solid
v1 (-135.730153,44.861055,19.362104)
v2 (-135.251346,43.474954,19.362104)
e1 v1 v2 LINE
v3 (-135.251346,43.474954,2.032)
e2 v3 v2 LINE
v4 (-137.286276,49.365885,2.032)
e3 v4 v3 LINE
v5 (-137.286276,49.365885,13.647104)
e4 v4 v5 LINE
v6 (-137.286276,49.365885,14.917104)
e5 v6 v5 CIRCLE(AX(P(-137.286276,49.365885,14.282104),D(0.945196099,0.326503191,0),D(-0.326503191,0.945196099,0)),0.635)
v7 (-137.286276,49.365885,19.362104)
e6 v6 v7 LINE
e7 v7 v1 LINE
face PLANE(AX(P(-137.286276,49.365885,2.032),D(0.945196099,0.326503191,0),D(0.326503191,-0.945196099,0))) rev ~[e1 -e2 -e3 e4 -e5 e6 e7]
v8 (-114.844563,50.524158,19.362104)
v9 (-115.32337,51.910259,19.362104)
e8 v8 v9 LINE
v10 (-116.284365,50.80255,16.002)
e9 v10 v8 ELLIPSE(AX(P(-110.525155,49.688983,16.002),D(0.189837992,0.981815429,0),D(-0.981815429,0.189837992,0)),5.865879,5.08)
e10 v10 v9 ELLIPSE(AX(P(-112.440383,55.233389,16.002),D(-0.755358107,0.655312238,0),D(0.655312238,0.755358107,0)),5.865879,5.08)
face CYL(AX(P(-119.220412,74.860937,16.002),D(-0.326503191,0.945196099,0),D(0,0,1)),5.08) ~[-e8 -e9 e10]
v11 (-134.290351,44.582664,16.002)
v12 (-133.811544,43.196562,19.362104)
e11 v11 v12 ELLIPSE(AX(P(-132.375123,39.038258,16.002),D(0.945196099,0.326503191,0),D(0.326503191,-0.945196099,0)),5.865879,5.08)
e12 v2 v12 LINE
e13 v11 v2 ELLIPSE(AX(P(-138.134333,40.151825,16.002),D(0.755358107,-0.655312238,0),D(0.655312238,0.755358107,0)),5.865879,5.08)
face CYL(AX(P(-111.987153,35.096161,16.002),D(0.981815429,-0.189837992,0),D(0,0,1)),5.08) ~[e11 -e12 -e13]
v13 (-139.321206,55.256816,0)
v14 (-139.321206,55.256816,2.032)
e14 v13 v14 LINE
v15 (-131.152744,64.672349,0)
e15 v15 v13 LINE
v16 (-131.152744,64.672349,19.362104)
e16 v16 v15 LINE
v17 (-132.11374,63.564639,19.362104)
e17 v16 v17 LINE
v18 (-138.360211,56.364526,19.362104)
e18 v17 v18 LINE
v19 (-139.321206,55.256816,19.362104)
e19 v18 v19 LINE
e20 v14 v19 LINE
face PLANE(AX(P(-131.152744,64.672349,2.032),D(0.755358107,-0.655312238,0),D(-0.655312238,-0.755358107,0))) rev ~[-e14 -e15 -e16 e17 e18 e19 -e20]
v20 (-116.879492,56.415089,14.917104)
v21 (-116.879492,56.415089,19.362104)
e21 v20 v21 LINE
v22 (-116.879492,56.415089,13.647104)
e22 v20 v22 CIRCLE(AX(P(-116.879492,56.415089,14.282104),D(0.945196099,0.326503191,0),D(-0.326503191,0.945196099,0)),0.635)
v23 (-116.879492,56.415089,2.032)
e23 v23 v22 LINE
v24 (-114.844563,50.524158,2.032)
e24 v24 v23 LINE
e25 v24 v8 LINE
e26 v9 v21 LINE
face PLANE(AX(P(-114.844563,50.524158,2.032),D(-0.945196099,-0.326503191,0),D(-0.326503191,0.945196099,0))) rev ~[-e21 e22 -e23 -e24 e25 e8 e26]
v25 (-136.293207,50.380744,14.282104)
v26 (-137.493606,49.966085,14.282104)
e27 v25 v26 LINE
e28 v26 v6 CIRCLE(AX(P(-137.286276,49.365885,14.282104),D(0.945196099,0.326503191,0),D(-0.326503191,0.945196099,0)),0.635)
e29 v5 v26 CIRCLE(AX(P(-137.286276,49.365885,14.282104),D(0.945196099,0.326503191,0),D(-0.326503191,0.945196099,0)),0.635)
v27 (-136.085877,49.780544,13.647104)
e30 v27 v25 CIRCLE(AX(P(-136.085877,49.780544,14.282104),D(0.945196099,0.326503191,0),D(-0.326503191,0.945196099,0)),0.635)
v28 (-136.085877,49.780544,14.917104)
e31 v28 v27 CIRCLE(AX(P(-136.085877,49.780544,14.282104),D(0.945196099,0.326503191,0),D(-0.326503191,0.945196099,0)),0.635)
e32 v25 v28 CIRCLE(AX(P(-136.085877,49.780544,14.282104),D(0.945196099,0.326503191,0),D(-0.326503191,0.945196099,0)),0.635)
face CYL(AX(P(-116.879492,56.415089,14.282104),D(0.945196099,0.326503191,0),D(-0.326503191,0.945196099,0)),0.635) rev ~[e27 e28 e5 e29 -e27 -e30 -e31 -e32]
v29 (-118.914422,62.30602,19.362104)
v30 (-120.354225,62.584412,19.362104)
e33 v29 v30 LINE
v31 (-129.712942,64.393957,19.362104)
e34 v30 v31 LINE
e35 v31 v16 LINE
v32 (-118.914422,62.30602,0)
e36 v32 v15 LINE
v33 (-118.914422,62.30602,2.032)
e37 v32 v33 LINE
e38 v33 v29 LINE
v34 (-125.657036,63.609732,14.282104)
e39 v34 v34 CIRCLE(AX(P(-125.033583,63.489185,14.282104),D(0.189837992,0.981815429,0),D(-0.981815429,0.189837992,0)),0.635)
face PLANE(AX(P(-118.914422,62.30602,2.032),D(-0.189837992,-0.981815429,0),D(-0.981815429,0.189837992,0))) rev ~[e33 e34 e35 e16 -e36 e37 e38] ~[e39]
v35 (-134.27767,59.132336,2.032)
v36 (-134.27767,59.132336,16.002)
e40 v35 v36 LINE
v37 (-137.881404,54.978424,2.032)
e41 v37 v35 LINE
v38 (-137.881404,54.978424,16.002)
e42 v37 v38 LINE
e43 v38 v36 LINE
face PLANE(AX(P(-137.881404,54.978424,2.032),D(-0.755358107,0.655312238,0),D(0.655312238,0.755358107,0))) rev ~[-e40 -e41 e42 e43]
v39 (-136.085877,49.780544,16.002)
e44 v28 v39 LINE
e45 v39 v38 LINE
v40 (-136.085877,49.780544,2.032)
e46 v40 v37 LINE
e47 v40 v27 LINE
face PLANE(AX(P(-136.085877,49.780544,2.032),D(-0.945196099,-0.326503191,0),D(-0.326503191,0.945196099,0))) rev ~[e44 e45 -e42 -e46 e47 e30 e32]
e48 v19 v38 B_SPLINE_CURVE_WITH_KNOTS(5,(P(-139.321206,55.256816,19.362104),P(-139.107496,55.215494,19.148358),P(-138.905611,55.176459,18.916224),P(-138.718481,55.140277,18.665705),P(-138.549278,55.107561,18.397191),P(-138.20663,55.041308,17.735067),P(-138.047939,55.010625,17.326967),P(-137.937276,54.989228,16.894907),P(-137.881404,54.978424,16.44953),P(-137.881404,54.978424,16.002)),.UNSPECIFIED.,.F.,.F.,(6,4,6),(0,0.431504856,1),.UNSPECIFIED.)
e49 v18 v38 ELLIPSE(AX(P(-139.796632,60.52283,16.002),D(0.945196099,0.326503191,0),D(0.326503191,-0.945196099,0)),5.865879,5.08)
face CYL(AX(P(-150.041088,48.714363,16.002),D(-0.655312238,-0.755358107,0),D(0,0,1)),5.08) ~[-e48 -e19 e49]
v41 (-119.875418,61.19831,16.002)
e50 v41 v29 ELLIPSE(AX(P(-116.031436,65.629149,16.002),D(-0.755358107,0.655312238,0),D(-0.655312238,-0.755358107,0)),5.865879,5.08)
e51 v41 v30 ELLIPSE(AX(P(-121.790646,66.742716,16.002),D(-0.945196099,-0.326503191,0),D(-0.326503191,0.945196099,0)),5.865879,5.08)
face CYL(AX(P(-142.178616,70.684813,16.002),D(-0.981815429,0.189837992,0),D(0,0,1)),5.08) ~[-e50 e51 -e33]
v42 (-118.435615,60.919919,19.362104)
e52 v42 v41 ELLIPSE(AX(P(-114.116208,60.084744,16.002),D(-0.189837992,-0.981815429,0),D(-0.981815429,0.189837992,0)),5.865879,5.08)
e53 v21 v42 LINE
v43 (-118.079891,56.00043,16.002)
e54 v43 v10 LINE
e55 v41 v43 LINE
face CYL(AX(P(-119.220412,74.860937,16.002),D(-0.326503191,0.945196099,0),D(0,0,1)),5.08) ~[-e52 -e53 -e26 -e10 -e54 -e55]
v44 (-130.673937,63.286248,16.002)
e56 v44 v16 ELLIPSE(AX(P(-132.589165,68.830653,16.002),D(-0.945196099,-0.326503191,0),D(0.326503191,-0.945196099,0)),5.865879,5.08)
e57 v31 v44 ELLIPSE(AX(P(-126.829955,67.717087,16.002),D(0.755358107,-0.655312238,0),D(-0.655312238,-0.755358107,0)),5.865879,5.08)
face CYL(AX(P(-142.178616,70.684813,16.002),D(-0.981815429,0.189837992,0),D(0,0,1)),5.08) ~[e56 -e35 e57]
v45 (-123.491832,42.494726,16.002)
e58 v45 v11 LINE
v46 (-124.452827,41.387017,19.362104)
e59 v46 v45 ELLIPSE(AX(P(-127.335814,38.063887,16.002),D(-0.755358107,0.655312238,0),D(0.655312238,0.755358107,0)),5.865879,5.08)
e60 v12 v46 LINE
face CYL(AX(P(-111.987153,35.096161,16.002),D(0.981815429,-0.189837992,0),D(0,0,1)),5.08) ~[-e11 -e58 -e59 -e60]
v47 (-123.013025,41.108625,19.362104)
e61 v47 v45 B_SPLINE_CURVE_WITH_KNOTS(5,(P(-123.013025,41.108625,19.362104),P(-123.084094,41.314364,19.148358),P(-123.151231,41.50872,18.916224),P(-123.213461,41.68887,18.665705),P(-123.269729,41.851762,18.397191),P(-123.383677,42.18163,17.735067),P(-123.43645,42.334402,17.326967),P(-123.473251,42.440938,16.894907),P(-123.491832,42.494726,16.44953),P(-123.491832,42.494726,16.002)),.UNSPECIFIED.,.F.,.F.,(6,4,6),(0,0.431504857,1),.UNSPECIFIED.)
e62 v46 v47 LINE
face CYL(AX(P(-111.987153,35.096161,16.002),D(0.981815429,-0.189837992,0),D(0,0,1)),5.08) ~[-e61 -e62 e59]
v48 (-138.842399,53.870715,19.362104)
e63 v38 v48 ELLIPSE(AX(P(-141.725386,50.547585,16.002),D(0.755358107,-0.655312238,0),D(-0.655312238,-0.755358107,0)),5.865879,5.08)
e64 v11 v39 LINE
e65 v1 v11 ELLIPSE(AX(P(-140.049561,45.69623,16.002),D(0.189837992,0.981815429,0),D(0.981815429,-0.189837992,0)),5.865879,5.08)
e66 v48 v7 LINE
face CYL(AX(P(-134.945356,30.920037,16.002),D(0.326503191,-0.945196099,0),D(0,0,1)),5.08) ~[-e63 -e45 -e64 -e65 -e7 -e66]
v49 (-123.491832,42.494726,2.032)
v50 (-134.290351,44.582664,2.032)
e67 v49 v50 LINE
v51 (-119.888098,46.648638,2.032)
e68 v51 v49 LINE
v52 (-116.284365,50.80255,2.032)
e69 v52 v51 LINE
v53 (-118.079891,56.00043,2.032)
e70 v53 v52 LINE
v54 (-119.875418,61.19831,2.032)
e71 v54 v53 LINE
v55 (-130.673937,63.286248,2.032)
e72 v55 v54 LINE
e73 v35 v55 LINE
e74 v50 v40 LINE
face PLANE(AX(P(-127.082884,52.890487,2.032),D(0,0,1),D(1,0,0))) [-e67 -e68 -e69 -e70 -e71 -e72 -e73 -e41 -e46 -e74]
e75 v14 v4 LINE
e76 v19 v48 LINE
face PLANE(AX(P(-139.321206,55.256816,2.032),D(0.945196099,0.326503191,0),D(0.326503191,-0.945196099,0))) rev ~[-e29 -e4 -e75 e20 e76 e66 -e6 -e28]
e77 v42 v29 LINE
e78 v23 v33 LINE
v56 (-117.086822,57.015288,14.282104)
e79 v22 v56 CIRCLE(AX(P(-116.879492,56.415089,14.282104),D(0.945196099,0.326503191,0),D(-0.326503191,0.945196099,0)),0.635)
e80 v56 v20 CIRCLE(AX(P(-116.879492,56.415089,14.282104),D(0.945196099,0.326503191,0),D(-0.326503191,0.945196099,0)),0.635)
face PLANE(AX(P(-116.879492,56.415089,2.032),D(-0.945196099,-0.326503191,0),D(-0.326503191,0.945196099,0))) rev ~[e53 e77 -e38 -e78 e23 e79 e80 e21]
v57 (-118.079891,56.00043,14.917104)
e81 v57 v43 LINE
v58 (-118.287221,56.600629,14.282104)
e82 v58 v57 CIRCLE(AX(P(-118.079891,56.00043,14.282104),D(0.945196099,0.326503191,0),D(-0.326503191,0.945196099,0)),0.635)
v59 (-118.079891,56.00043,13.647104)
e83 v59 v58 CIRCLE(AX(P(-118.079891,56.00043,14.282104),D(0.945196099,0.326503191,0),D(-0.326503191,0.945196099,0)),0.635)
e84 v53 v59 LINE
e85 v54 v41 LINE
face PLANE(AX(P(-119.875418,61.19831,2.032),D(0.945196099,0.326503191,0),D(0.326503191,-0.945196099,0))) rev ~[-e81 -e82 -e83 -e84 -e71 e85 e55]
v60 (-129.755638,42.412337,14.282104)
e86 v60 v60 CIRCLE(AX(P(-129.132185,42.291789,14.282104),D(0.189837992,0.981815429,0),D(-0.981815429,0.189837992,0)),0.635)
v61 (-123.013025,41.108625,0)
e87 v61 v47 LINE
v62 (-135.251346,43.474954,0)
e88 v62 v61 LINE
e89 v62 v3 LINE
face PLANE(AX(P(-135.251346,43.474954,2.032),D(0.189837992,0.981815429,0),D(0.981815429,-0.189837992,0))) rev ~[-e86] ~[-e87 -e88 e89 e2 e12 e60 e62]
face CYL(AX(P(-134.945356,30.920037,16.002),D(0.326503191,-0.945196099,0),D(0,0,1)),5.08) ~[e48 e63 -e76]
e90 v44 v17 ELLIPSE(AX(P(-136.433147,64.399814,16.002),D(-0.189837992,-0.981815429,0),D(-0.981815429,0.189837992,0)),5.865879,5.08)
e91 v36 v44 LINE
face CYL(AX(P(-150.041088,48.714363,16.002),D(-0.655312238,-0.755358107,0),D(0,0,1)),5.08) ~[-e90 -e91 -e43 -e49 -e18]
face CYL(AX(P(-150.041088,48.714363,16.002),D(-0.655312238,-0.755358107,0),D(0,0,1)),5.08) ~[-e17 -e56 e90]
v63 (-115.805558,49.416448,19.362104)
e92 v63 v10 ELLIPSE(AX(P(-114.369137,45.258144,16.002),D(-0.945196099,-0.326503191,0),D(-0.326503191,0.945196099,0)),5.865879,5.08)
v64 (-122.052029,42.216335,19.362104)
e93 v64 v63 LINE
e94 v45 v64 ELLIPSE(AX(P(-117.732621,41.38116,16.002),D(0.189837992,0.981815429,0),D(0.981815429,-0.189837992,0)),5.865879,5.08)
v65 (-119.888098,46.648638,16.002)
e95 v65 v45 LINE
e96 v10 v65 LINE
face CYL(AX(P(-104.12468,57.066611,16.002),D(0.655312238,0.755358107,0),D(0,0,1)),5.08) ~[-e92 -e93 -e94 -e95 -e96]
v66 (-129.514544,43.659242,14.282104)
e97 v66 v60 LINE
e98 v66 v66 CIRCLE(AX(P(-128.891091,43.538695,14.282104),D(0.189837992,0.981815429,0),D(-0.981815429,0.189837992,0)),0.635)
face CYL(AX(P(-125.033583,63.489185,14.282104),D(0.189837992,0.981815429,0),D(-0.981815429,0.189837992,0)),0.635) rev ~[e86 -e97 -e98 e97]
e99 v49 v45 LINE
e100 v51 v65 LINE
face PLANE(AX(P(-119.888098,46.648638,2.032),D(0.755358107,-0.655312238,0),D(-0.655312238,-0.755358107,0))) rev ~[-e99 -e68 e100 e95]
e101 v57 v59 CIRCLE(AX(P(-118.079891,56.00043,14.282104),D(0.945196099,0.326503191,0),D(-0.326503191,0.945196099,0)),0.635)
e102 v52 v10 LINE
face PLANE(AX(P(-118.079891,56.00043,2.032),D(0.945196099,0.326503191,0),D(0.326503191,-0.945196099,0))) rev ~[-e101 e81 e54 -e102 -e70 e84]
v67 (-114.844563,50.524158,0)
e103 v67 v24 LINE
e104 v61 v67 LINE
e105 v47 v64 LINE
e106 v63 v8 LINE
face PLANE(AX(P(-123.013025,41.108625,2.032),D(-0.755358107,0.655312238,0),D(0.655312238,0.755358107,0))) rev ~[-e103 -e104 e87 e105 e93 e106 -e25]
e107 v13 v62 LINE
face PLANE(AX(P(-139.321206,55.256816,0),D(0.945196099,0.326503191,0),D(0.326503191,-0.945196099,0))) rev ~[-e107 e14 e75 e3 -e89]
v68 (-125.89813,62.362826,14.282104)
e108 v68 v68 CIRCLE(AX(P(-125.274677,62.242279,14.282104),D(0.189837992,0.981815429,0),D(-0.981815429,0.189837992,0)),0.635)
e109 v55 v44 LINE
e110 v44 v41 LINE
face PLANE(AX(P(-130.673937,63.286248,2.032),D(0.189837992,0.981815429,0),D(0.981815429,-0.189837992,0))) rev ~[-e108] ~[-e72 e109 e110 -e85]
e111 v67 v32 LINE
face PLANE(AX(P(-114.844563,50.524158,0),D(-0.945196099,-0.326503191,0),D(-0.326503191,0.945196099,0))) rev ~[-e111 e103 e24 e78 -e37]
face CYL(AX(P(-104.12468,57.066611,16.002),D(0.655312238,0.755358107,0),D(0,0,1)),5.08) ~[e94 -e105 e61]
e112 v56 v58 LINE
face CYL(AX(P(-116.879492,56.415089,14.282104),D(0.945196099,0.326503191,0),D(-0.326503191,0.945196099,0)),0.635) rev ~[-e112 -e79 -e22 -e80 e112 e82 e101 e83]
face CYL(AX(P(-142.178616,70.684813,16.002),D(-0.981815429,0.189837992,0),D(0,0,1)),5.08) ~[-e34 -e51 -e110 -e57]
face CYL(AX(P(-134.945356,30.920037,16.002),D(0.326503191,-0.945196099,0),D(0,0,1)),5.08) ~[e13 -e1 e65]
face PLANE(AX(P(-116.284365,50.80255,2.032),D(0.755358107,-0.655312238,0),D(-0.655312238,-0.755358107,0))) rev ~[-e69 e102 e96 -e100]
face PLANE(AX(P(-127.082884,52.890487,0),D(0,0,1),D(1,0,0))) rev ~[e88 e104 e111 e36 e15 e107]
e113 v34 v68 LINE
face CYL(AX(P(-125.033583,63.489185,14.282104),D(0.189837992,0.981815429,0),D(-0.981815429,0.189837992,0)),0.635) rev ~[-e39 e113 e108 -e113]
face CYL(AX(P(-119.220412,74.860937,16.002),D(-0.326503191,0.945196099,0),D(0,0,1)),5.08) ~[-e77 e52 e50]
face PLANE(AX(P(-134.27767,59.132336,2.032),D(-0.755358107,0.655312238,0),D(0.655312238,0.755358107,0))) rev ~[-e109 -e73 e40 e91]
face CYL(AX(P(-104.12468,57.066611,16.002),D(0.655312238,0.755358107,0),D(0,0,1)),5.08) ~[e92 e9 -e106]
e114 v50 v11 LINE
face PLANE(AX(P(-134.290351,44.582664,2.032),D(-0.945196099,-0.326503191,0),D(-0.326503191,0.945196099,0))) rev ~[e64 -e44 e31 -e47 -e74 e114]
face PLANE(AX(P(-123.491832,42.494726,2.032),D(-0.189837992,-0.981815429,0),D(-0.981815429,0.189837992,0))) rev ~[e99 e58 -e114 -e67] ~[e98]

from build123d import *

# Parameters (mm, degrees)
F1_DEPTH      = 2.032
F3_DEPTH      = 19.05
F4_T4_DEPTH   = 36.3985226281
F4_T10_DEPTH  = 36.3985226281
F4_T16_DEPTH  = 36.3985226281
F4_T22_DEPTH  = 36.3985226281
F4_T28_DEPTH  = 36.3985226281
F4_T34_DEPTH  = 36.3985226281
F4_T41_DEPTH  = 36.3985226281
F4_T47_DEPTH  = 36.3985226281
F4_T56_DEPTH  = 36.3985226281
F4_T62_DEPTH  = 36.3985226281
F4_T71_DEPTH  = 36.3985226281
F4_T77_DEPTH  = 36.3985226281
F4_T86_DEPTH  = 36.3985226281
F4_T92_DEPTH  = 36.3985226281
F4_T101_DEPTH = 36.3985226281
F4_T107_DEPTH = 36.3985226281
F4_T116_DEPTH = 36.3985226281
F4_T122_DEPTH = 36.3985226281
F6_R          = 0.635
F7_DEPTH      = 25.4
F5_R          = 0.635
F8_DEPTH      = 25.4


# Not quite as in the source:
# - a fillet or chamfer that OpenCascade refuses, or shapes differently, is made with other operations: its cross-section is extruded or revolved along the edge and cut away or added


with BuildPart() as f1:
    # F0 (on Top) → F1 (new body)
    with BuildSketch(Plane.XY):
        Polygon((-123.0130245504, 41.1086249019), (-114.844562537, 50.5241579017), (-118.9144222983, 62.306020015), (-131.1527440729, 64.6723491286), (-139.3212060863, 55.2568161288), (-135.2513463251, 43.4749540155), align=None)
    extrude(amount=F1_DEPTH)

    # F2 (on face) → F3 (join)
    with BuildSketch(Plane.XY.offset(2.032)):
        Polygon((-131.1527440729, 64.6723491286), (-135.2369750796, 59.9645826287), (-134.2776702834, 59.1323360859), (-130.6739370422, 63.2862477035), (-119.8754178293, 61.1983102503), (-118.079891464, 56.0004299062), (-116.8794924177, 56.4150889583), (-118.9144222983, 62.306020015), align=None)
        Polygon((-134.2776702834, 59.1323360859), (-135.2369750796, 59.9645826287), (-139.3212060863, 55.2568161288), (-137.2862762057, 49.3658850722), (-136.0858771593, 49.7805441243), (-137.8814035246, 54.9784244684), align=None)
        Polygon((-136.0858771593, 49.7805441243), (-137.2862762057, 49.3658850722), (-135.2513463251, 43.4749540155), (-123.0130245504, 41.1086249019), (-118.9287935437, 45.8163914018), (-119.88809834, 46.6486379446), (-123.4918315812, 42.494726327), (-134.2903507941, 44.5826637802), align=None)
        Polygon((-116.2843650988, 50.8025495621), (-119.88809834, 46.6486379446), (-118.9287935437, 45.8163914018), (-114.844562537, 50.5241579017), (-116.8794924177, 56.4150889583), (-118.079891464, 56.0004299062), align=None)
    extrude(amount=F3_DEPTH)

    # F4: fillet of radius 5.08 on 6 edges, made by hand


with BuildPart() as f4_tool2:
    # F4_s3 → F4_t4 (new body)
    with BuildSketch(Plane(origin=(-40.3193780899, -46.4748975157, 0), x_dir=(0, 0, 1), z_dir=(0.6553122384, 0.7553581073, 0))):
        with BuildLine():
            ThreePointArc((21.082, -145.2578703952), (19.5941024484, -141.6657679468), (16.002, -140.1778703952))
            Line((16.002, -140.1778703952), (21.082, -140.1778703952))
            Line((21.082, -140.1778703952), (21.082, -145.2578703952))
        make_face()
    extrude(amount=F4_T4_DEPTH)

    split(bisect_by=Plane(origin=(7.0863744403, 36.6497331747, 0), x_dir=(0, 0, 1), z_dir=(-0.1898379922, -0.981815429, 0)), keep=Keep.TOP)

    split(bisect_by=Plane(origin=(-106.215781989, -36.6905785323, 0), x_dir=(0, 0, 1), z_dir=(0.9451960995, 0.3265031907, 0)), keep=Keep.TOP)


with BuildPart() as f1_1:
    add(f1.part)

    # F4_t1: cut F4_tool2
    add(f4_tool2.part, mode=Mode.SUBTRACT)


with BuildPart() as f4_tool8:
    # F4_s9 → F4_t10 (new body)
    with BuildSketch(Plane(origin=(-150.2293674314, 29.0474570301, 0), x_dir=(0, 0, 1), z_dir=(0.981815429, -0.1898379922, 0))):
        with BuildLine():
            ThreePointArc((21.082, -42.4085365971), (19.5941024484, -38.8164341487), (16.002, -37.3285365971))
            Line((16.002, -37.3285365971), (21.082, -37.3285365971))
            Line((21.082, -37.3285365971), (21.082, -42.4085365971))
        make_face()
    extrude(amount=F4_T10_DEPTH)

    split(bisect_by=Plane(origin=(-88.2097962936, -30.4706927504, 0), x_dir=(0, 0, 1), z_dir=(-0.9451960995, -0.3265031907, 0)), keep=Keep.TOP)

    split(bisect_by=Plane(origin=(-105.8844908623, 91.8602740219, 0), x_dir=(0, 0, 1), z_dir=(0.7553581073, -0.6553122384, 0)), keep=Keep.TOP)


with BuildPart() as f1_2:
    add(f1_1.part)

    # F4_t7: cut F4_tool8
    add(f4_tool8.part, mode=Mode.SUBTRACT)


with BuildPart() as f4_tool14:
    # F4_s15 → F4_t16 (new body)
    with BuildSketch(Plane(origin=(-35.8122120569, 103.6729934642, 0), x_dir=(0, 0, 1), z_dir=(0.3265031907, -0.9451960995, 0))):
        with BuildLine():
            ThreePointArc((21.082, 88.2443337981), (19.5941024484, 91.8364362465), (16.002, 93.3243337981))
            Line((16.002, 93.3243337981), (21.082, 93.3243337981))
            Line((21.082, 93.3243337981), (21.082, 88.2443337981))
        make_face()
    extrude(amount=F4_T16_DEPTH)

    split(bisect_by=Plane(origin=(-91.4949189189, 79.3765758805, 0), x_dir=(0, 0, 1), z_dir=(-0.7553581073, 0.6553122384, 0)), keep=Keep.TOP)

    split(bisect_by=Plane(origin=(7.0863744403, 36.6497331747, 0), x_dir=(0, 0, 1), z_dir=(-0.1898379922, -0.981815429, 0)), keep=Keep.TOP)


with BuildPart() as f1_3:
    add(f1_2.part)

    # F4_t13: cut F4_tool14
    add(f4_tool14.part, mode=Mode.SUBTRACT)


with BuildPart() as f4_tool20:
    # F4_s21 → F4_t22 (new body)
    with BuildSketch(Plane(origin=(-16.4669807523, -18.9809783561, 0), x_dir=(0, 0, 1), z_dir=(-0.6553122384, -0.7553581073, 0))):
        with BuildLine():
            ThreePointArc((21.082, 116.0478703952), (19.5941024484, 119.6399728436), (16.002, 121.1278703952))
            Line((16.002, 121.1278703952), (21.082, 121.1278703952))
            Line((21.082, 121.1278703952), (21.082, 116.0478703952))
        make_face()
    extrude(amount=F4_T22_DEPTH)

    split(bisect_by=Plane(origin=(-88.2097962936, -30.4706927504, 0), x_dir=(0, 0, 1), z_dir=(-0.9451960995, -0.3265031907, 0)), keep=Keep.TOP)

    split(bisect_by=Plane(origin=(3.4699606884, 17.9461492514, 0), x_dir=(0, 0, 1), z_dir=(0.1898379922, 0.981815429, 0)), keep=Keep.TOP)


with BuildPart() as f1_4:
    add(f1_3.part)

    # F4_t19: cut F4_tool20
    add(f4_tool20.part, mode=Mode.SUBTRACT)


with BuildPart() as f4_tool26:
    # F4_s27 → F4_t28 (new body)
    with BuildSketch(Plane(origin=(-114.4927363208, 22.1376345743, 0), x_dir=(0, 0, 1), z_dir=(-0.981815429, 0.1898379922, 0))):
        with BuildLine():
            ThreePointArc((21.082, 13.1985365971), (19.5941024484, 16.7906390456), (16.002, 18.2785365971))
            Line((16.002, 18.2785365971), (21.082, 18.2785365971))
            Line((21.082, 18.2785365971), (21.082, 13.1985365971))
        make_face()
    extrude(amount=F4_T28_DEPTH)

    split(bisect_by=Plane(origin=(-91.4949189189, 79.3765758805, 0), x_dir=(0, 0, 1), z_dir=(-0.7553581073, 0.6553122384, 0)), keep=Keep.TOP)

    split(bisect_by=Plane(origin=(-106.215781989, -36.6905785323, 0), x_dir=(0, 0, 1), z_dir=(0.9451960995, 0.3265031907, 0)), keep=Keep.TOP)


with BuildPart() as f1_5:
    add(f1_4.part)

    # F4_t25: cut F4_tool26
    add(f4_tool26.part, mode=Mode.SUBTRACT)


with BuildPart() as f4_tool32:
    # F4_s33 → F4_t34 (new body)
    with BuildSketch(Plane(origin=(-23.9279782839, 69.2692518489, 0), x_dir=(0, 0, 1), z_dir=(-0.3265031907, 0.9451960995, 0))):
        with BuildLine():
            ThreePointArc((21.082, -117.4543337981), (19.5941024484, -113.8622313496), (16.002, -112.3743337981))
            Line((16.002, -112.3743337981), (21.082, -112.3743337981))
            Line((21.082, -112.3743337981), (21.082, -117.4543337981))
        make_face()
    extrude(amount=F4_T34_DEPTH)

    split(bisect_by=Plane(origin=(-105.8844908623, 91.8602740219, 0), x_dir=(0, 0, 1), z_dir=(0.7553581073, -0.6553122384, 0)), keep=Keep.TOP)

    split(bisect_by=Plane(origin=(3.4699606884, 17.9461492514, 0), x_dir=(0, 0, 1), z_dir=(0.1898379922, 0.981815429, 0)), keep=Keep.TOP)


with BuildPart() as f1_6:
    add(f1_5.part)

    # F4_t31: cut F4_tool32
    add(f4_tool32.part, mode=Mode.SUBTRACT)


with BuildPart() as f4_tool39:
    # F4_s40 → F4_t41 (new body)
    with BuildSketch(Plane(origin=(-23.9279782839, 69.2692518489, 0), x_dir=(0, 0, 1), z_dir=(-0.3265031907, 0.9451960995, 0))):
        with BuildLine():
            ThreePointArc((21.082, -117.4543337981), (19.5941024484, -113.8622313496), (16.002, -112.3743337981))
            Line((16.002, -112.3743337981), (21.082, -112.3743337981))
            Line((21.082, -112.3743337981), (21.082, -117.4543337981))
        make_face()
    extrude(amount=F4_T41_DEPTH)

    split(bisect_by=Plane(origin=(-106.8437956585, 92.6925205646, 0), x_dir=(0, 0, 1), z_dir=(0.7553581073, -0.6553122384, 0)), keep=Keep.TOP)

    split(bisect_by=Plane(origin=(-105.8844908623, 91.8602740219, 0), x_dir=(0, 0, 1), z_dir=(-0.7553581073, 0.6553122384, 0)), keep=Keep.TOP)

    split(bisect_by=Plane(origin=(-107.4161810353, -37.1052375844, 0), x_dir=(0, 0, 1), z_dir=(0.9451960995, 0.3265031907, 0)), keep=Keep.TOP)


with BuildPart() as f4_tool45:
    # F4_s46 → F4_t47 (new body)
    with BuildSketch(Plane(origin=(-40.3193780899, -46.4748975157, 0), x_dir=(0, 0, 1), z_dir=(0.6553122384, 0.7553581073, 0))):
        with BuildLine():
            ThreePointArc((21.082, -145.2578703952), (19.5941024484, -141.6657679468), (16.002, -140.1778703952))
            Line((16.002, -140.1778703952), (21.082, -140.1778703952))
            Line((21.082, -140.1778703952), (21.082, -145.2578703952))
        make_face()
    extrude(amount=F4_T47_DEPTH)

    split(bisect_by=Plane(origin=(-106.8437956585, 92.6925205646, 0), x_dir=(0, 0, 1), z_dir=(0.7553581073, -0.6553122384, 0)), keep=Keep.TOP)

    split(bisect_by=Plane(origin=(-106.215781989, -36.6905785323, 0), x_dir=(0, 0, 1), z_dir=(-0.9451960995, -0.3265031907, 0)), keep=Keep.TOP)

    split(bisect_by=Plane(origin=(-107.4161810353, -37.1052375844, 0), x_dir=(0, 0, 1), z_dir=(0.9451960995, 0.3265031907, 0)), keep=Keep.TOP)


with BuildPart() as f4_tool39_1:
    add(f4_tool39.part)

    # F4_t51: intersect F4_tool45
    add(f4_tool45.part, mode=Mode.INTERSECT)


with BuildPart() as f1_7:
    add(f1_6.part)

    # F4_t37: cut F4_tool39
    add(f4_tool39_1.part, mode=Mode.SUBTRACT)


with BuildPart() as f4_tool54:
    # F4_s55 → F4_t56 (new body)
    with BuildSketch(Plane(origin=(-40.3193780899, -46.4748975157, 0), x_dir=(0, 0, 1), z_dir=(0.6553122384, 0.7553581073, 0))):
        with BuildLine():
            ThreePointArc((21.082, -145.2578703952), (19.5941024484, -141.6657679468), (16.002, -140.1778703952))
            Line((16.002, -140.1778703952), (21.082, -140.1778703952))
            Line((21.082, -140.1778703952), (21.082, -145.2578703952))
        make_face()
    extrude(amount=F4_T56_DEPTH)

    split(bisect_by=Plane(origin=(-106.8437956585, 92.6925205646, 0), x_dir=(0, 0, 1), z_dir=(0.7553581073, -0.6553122384, 0)), keep=Keep.TOP)

    split(bisect_by=Plane(origin=(7.3274686905, 37.8966387696, 0), x_dir=(0, 0, 1), z_dir=(-0.1898379922, -0.981815429, 0)), keep=Keep.TOP)

    split(bisect_by=Plane(origin=(7.0863744403, 36.6497331747, 0), x_dir=(0, 0, 1), z_dir=(0.1898379922, 0.981815429, 0)), keep=Keep.TOP)


with BuildPart() as f4_tool60:
    # F4_s61 → F4_t62 (new body)
    with BuildSketch(Plane(origin=(-150.2293674314, 29.0474570301, 0), x_dir=(0, 0, 1), z_dir=(0.981815429, -0.1898379922, 0))):
        with BuildLine():
            ThreePointArc((21.082, -42.4085365971), (19.5941024484, -38.8164341487), (16.002, -37.3285365971))
            Line((16.002, -37.3285365971), (21.082, -37.3285365971))
            Line((21.082, -37.3285365971), (21.082, -42.4085365971))
        make_face()
    extrude(amount=F4_T62_DEPTH)

    split(bisect_by=Plane(origin=(-106.8437956585, 92.6925205646, 0), x_dir=(0, 0, 1), z_dir=(0.7553581073, -0.6553122384, 0)), keep=Keep.TOP)

    split(bisect_by=Plane(origin=(7.3274686905, 37.8966387696, 0), x_dir=(0, 0, 1), z_dir=(-0.1898379922, -0.981815429, 0)), keep=Keep.TOP)

    split(bisect_by=Plane(origin=(-105.8844908623, 91.8602740219, 0), x_dir=(0, 0, 1), z_dir=(-0.7553581073, 0.6553122384, 0)), keep=Keep.TOP)


with BuildPart() as f4_tool54_1:
    add(f4_tool54.part)

    # F4_t66: intersect F4_tool60
    add(f4_tool60.part, mode=Mode.INTERSECT)


with BuildPart() as f1_8:
    add(f1_7.part)

    # F4_t52: cut F4_tool54
    add(f4_tool54_1.part, mode=Mode.SUBTRACT)


with BuildPart() as f4_tool69:
    # F4_s70 → F4_t71 (new body)
    with BuildSketch(Plane(origin=(-150.2293674314, 29.0474570301, 0), x_dir=(0, 0, 1), z_dir=(0.981815429, -0.1898379922, 0))):
        with BuildLine():
            ThreePointArc((21.082, -42.4085365971), (19.5941024484, -38.8164341487), (16.002, -37.3285365971))
            Line((16.002, -37.3285365971), (21.082, -37.3285365971))
            Line((21.082, -37.3285365971), (21.082, -42.4085365971))
        make_face()
    extrude(amount=F4_T71_DEPTH)

    split(bisect_by=Plane(origin=(7.3274686905, 37.8966387696, 0), x_dir=(0, 0, 1), z_dir=(-0.1898379922, -0.981815429, 0)), keep=Keep.TOP)

    split(bisect_by=Plane(origin=(-87.0093972473, -30.0560336983, 0), x_dir=(0, 0, 1), z_dir=(-0.9451960995, -0.3265031907, 0)), keep=Keep.TOP)

    split(bisect_by=Plane(origin=(-88.2097962936, -30.4706927504, 0), x_dir=(0, 0, 1), z_dir=(0.9451960995, 0.3265031907, 0)), keep=Keep.TOP)


with BuildPart() as f4_tool75:
    # F4_s76 → F4_t77 (new body)
    with BuildSketch(Plane(origin=(-35.8122120569, 103.6729934642, 0), x_dir=(0, 0, 1), z_dir=(0.3265031907, -0.9451960995, 0))):
        with BuildLine():
            ThreePointArc((21.082, 88.2443337981), (19.5941024484, 91.8364362465), (16.002, 93.3243337981))
            Line((16.002, 93.3243337981), (21.082, 93.3243337981))
            Line((21.082, 93.3243337981), (21.082, 88.2443337981))
        make_face()
    extrude(amount=F4_T77_DEPTH)

    split(bisect_by=Plane(origin=(7.3274686905, 37.8966387696, 0), x_dir=(0, 0, 1), z_dir=(-0.1898379922, -0.981815429, 0)), keep=Keep.TOP)

    split(bisect_by=Plane(origin=(-87.0093972473, -30.0560336983, 0), x_dir=(0, 0, 1), z_dir=(-0.9451960995, -0.3265031907, 0)), keep=Keep.TOP)

    split(bisect_by=Plane(origin=(7.0863744403, 36.6497331747, 0), x_dir=(0, 0, 1), z_dir=(0.1898379922, 0.981815429, 0)), keep=Keep.TOP)


with BuildPart() as f4_tool69_1:
    add(f4_tool69.part)

    # F4_t81: intersect F4_tool75
    add(f4_tool75.part, mode=Mode.INTERSECT)


with BuildPart() as f1_9:
    add(f1_8.part)

    # F4_t67: cut F4_tool69
    add(f4_tool69_1.part, mode=Mode.SUBTRACT)


with BuildPart() as f4_tool84:
    # F4_s85 → F4_t86 (new body)
    with BuildSketch(Plane(origin=(-35.8122120569, 103.6729934642, 0), x_dir=(0, 0, 1), z_dir=(0.3265031907, -0.9451960995, 0))):
        with BuildLine():
            ThreePointArc((21.082, 88.2443337981), (19.5941024484, 91.8364362465), (16.002, 93.3243337981))
            Line((16.002, 93.3243337981), (21.082, 93.3243337981))
            Line((21.082, 93.3243337981), (21.082, 88.2443337981))
        make_face()
    extrude(amount=F4_T86_DEPTH)

    split(bisect_by=Plane(origin=(-87.0093972473, -30.0560336983, 0), x_dir=(0, 0, 1), z_dir=(-0.9451960995, -0.3265031907, 0)), keep=Keep.TOP)

    split(bisect_by=Plane(origin=(-90.5356141227, 78.5443293377, 0), x_dir=(0, 0, 1), z_dir=(-0.7553581073, 0.6553122384, 0)), keep=Keep.TOP)

    split(bisect_by=Plane(origin=(-91.4949189189, 79.3765758805, 0), x_dir=(0, 0, 1), z_dir=(0.7553581073, -0.6553122384, 0)), keep=Keep.TOP)


with BuildPart() as f4_tool90:
    # F4_s91 → F4_t92 (new body)
    with BuildSketch(Plane(origin=(-16.4669807523, -18.9809783561, 0), x_dir=(0, 0, 1), z_dir=(-0.6553122384, -0.7553581073, 0))):
        with BuildLine():
            ThreePointArc((21.082, 116.0478703952), (19.5941024484, 119.6399728436), (16.002, 121.1278703952))
            Line((16.002, 121.1278703952), (21.082, 121.1278703952))
            Line((21.082, 121.1278703952), (21.082, 116.0478703952))
        make_face()
    extrude(amount=F4_T92_DEPTH)

    split(bisect_by=Plane(origin=(-87.0093972473, -30.0560336983, 0), x_dir=(0, 0, 1), z_dir=(-0.9451960995, -0.3265031907, 0)), keep=Keep.TOP)

    split(bisect_by=Plane(origin=(-90.5356141227, 78.5443293377, 0), x_dir=(0, 0, 1), z_dir=(-0.7553581073, 0.6553122384, 0)), keep=Keep.TOP)

    split(bisect_by=Plane(origin=(-88.2097962936, -30.4706927504, 0), x_dir=(0, 0, 1), z_dir=(0.9451960995, 0.3265031907, 0)), keep=Keep.TOP)


with BuildPart() as f4_tool84_1:
    add(f4_tool84.part)

    # F4_t96: intersect F4_tool90
    add(f4_tool90.part, mode=Mode.INTERSECT)


with BuildPart() as f1_10:
    add(f1_9.part)

    # F4_t82: cut F4_tool84
    add(f4_tool84_1.part, mode=Mode.SUBTRACT)


with BuildPart() as f4_tool99:
    # F4_s100 → F4_t101 (new body)
    with BuildSketch(Plane(origin=(-114.4927363208, 22.1376345743, 0), x_dir=(0, 0, 1), z_dir=(-0.981815429, 0.1898379922, 0))):
        with BuildLine():
            ThreePointArc((21.082, 13.1985365971), (19.5941024484, 16.7906390456), (16.002, 18.2785365971))
            Line((16.002, 18.2785365971), (21.082, 18.2785365971))
            Line((21.082, 18.2785365971), (21.082, 13.1985365971))
        make_face()
    extrude(amount=F4_T101_DEPTH)

    split(bisect_by=Plane(origin=(3.2288664383, 16.6992436565, 0), x_dir=(0, 0, 1), z_dir=(0.1898379922, 0.981815429, 0)), keep=Keep.TOP)

    split(bisect_by=Plane(origin=(-90.5356141227, 78.5443293377, 0), x_dir=(0, 0, 1), z_dir=(-0.7553581073, 0.6553122384, 0)), keep=Keep.TOP)

    split(bisect_by=Plane(origin=(-91.4949189189, 79.3765758805, 0), x_dir=(0, 0, 1), z_dir=(0.7553581073, -0.6553122384, 0)), keep=Keep.TOP)


with BuildPart() as f4_tool105:
    # F4_s106 → F4_t107 (new body)
    with BuildSketch(Plane(origin=(-16.4669807523, -18.9809783561, 0), x_dir=(0, 0, 1), z_dir=(-0.6553122384, -0.7553581073, 0))):
        with BuildLine():
            ThreePointArc((21.082, 116.0478703952), (19.5941024484, 119.6399728436), (16.002, 121.1278703952))
            Line((16.002, 121.1278703952), (21.082, 121.1278703952))
            Line((21.082, 121.1278703952), (21.082, 116.0478703952))
        make_face()
    extrude(amount=F4_T107_DEPTH)

    split(bisect_by=Plane(origin=(3.2288664383, 16.6992436565, 0), x_dir=(0, 0, 1), z_dir=(0.1898379922, 0.981815429, 0)), keep=Keep.TOP)

    split(bisect_by=Plane(origin=(-90.5356141227, 78.5443293377, 0), x_dir=(0, 0, 1), z_dir=(-0.7553581073, 0.6553122384, 0)), keep=Keep.TOP)

    split(bisect_by=Plane(origin=(3.4699606884, 17.9461492514, 0), x_dir=(0, 0, 1), z_dir=(-0.1898379922, -0.981815429, 0)), keep=Keep.TOP)


with BuildPart() as f4_tool99_1:
    add(f4_tool99.part)

    # F4_t111: intersect F4_tool105
    add(f4_tool105.part, mode=Mode.INTERSECT)


with BuildPart() as f1_11:
    add(f1_10.part)

    # F4_t97: cut F4_tool99
    add(f4_tool99_1.part, mode=Mode.SUBTRACT)


with BuildPart() as f4_tool114:
    # F4_s115 → F4_t116 (new body)
    with BuildSketch(Plane(origin=(-114.4927363208, 22.1376345743, 0), x_dir=(0, 0, 1), z_dir=(-0.981815429, 0.1898379922, 0))):
        with BuildLine():
            ThreePointArc((21.082, 13.1985365971), (19.5941024484, 16.7906390456), (16.002, 18.2785365971))
            Line((16.002, 18.2785365971), (21.082, 18.2785365971))
            Line((21.082, 18.2785365971), (21.082, 13.1985365971))
        make_face()
    extrude(amount=F4_T116_DEPTH)

    split(bisect_by=Plane(origin=(3.2288664383, 16.6992436565, 0), x_dir=(0, 0, 1), z_dir=(0.1898379922, 0.981815429, 0)), keep=Keep.TOP)

    split(bisect_by=Plane(origin=(-106.215781989, -36.6905785323, 0), x_dir=(0, 0, 1), z_dir=(-0.9451960995, -0.3265031907, 0)), keep=Keep.TOP)

    split(bisect_by=Plane(origin=(-107.4161810353, -37.1052375844, 0), x_dir=(0, 0, 1), z_dir=(0.9451960995, 0.3265031907, 0)), keep=Keep.TOP)


with BuildPart() as f4_tool120:
    # F4_s121 → F4_t122 (new body)
    with BuildSketch(Plane(origin=(-23.9279782839, 69.2692518489, 0), x_dir=(0, 0, 1), z_dir=(-0.3265031907, 0.9451960995, 0))):
        with BuildLine():
            ThreePointArc((21.082, -117.4543337981), (19.5941024484, -113.8622313496), (16.002, -112.3743337981))
            Line((16.002, -112.3743337981), (21.082, -112.3743337981))
            Line((21.082, -112.3743337981), (21.082, -117.4543337981))
        make_face()
    extrude(amount=F4_T122_DEPTH)

    split(bisect_by=Plane(origin=(3.2288664383, 16.6992436565, 0), x_dir=(0, 0, 1), z_dir=(0.1898379922, 0.981815429, 0)), keep=Keep.TOP)

    split(bisect_by=Plane(origin=(3.4699606884, 17.9461492514, 0), x_dir=(0, 0, 1), z_dir=(-0.1898379922, -0.981815429, 0)), keep=Keep.TOP)

    split(bisect_by=Plane(origin=(-107.4161810353, -37.1052375844, 0), x_dir=(0, 0, 1), z_dir=(0.9451960995, 0.3265031907, 0)), keep=Keep.TOP)


with BuildPart() as f4_tool114_1:
    add(f4_tool114.part)

    # F4_t126: intersect F4_tool120
    add(f4_tool120.part, mode=Mode.INTERSECT)


with BuildPart() as f1_12:
    add(f1_11.part)

    # F4_t112: cut F4_tool114
    add(f4_tool114_1.part, mode=Mode.SUBTRACT)

    # F6 (on face) → F7 (cut)
    with BuildSketch(Plane(origin=(7.3274686905, 37.8966387696, 0), x_dir=(-0.981815429, 0.1898379922, 0), z_dir=(0.1898379922, 0.981815429, 0))):
        with Locations((134.8125604474, 14.2821041651)):
            Circle(F6_R)
    extrude(amount=-F7_DEPTH, mode=Mode.SUBTRACT)

    # F5 (on face) → F8 (cut)
    with BuildSketch(Plane(origin=(-87.0093972473, -30.0560336983, 0), x_dir=(-0.3265031907, 0.9451960995, 0), z_dir=(0.9451960995, 0.3265031907, 0))):
        with Locations((91.4848492319, 14.2821041651)):
            Circle(F5_R)
    extrude(amount=-F8_DEPTH, mode=Mode.SUBTRACT)


solid = f1_12.part
